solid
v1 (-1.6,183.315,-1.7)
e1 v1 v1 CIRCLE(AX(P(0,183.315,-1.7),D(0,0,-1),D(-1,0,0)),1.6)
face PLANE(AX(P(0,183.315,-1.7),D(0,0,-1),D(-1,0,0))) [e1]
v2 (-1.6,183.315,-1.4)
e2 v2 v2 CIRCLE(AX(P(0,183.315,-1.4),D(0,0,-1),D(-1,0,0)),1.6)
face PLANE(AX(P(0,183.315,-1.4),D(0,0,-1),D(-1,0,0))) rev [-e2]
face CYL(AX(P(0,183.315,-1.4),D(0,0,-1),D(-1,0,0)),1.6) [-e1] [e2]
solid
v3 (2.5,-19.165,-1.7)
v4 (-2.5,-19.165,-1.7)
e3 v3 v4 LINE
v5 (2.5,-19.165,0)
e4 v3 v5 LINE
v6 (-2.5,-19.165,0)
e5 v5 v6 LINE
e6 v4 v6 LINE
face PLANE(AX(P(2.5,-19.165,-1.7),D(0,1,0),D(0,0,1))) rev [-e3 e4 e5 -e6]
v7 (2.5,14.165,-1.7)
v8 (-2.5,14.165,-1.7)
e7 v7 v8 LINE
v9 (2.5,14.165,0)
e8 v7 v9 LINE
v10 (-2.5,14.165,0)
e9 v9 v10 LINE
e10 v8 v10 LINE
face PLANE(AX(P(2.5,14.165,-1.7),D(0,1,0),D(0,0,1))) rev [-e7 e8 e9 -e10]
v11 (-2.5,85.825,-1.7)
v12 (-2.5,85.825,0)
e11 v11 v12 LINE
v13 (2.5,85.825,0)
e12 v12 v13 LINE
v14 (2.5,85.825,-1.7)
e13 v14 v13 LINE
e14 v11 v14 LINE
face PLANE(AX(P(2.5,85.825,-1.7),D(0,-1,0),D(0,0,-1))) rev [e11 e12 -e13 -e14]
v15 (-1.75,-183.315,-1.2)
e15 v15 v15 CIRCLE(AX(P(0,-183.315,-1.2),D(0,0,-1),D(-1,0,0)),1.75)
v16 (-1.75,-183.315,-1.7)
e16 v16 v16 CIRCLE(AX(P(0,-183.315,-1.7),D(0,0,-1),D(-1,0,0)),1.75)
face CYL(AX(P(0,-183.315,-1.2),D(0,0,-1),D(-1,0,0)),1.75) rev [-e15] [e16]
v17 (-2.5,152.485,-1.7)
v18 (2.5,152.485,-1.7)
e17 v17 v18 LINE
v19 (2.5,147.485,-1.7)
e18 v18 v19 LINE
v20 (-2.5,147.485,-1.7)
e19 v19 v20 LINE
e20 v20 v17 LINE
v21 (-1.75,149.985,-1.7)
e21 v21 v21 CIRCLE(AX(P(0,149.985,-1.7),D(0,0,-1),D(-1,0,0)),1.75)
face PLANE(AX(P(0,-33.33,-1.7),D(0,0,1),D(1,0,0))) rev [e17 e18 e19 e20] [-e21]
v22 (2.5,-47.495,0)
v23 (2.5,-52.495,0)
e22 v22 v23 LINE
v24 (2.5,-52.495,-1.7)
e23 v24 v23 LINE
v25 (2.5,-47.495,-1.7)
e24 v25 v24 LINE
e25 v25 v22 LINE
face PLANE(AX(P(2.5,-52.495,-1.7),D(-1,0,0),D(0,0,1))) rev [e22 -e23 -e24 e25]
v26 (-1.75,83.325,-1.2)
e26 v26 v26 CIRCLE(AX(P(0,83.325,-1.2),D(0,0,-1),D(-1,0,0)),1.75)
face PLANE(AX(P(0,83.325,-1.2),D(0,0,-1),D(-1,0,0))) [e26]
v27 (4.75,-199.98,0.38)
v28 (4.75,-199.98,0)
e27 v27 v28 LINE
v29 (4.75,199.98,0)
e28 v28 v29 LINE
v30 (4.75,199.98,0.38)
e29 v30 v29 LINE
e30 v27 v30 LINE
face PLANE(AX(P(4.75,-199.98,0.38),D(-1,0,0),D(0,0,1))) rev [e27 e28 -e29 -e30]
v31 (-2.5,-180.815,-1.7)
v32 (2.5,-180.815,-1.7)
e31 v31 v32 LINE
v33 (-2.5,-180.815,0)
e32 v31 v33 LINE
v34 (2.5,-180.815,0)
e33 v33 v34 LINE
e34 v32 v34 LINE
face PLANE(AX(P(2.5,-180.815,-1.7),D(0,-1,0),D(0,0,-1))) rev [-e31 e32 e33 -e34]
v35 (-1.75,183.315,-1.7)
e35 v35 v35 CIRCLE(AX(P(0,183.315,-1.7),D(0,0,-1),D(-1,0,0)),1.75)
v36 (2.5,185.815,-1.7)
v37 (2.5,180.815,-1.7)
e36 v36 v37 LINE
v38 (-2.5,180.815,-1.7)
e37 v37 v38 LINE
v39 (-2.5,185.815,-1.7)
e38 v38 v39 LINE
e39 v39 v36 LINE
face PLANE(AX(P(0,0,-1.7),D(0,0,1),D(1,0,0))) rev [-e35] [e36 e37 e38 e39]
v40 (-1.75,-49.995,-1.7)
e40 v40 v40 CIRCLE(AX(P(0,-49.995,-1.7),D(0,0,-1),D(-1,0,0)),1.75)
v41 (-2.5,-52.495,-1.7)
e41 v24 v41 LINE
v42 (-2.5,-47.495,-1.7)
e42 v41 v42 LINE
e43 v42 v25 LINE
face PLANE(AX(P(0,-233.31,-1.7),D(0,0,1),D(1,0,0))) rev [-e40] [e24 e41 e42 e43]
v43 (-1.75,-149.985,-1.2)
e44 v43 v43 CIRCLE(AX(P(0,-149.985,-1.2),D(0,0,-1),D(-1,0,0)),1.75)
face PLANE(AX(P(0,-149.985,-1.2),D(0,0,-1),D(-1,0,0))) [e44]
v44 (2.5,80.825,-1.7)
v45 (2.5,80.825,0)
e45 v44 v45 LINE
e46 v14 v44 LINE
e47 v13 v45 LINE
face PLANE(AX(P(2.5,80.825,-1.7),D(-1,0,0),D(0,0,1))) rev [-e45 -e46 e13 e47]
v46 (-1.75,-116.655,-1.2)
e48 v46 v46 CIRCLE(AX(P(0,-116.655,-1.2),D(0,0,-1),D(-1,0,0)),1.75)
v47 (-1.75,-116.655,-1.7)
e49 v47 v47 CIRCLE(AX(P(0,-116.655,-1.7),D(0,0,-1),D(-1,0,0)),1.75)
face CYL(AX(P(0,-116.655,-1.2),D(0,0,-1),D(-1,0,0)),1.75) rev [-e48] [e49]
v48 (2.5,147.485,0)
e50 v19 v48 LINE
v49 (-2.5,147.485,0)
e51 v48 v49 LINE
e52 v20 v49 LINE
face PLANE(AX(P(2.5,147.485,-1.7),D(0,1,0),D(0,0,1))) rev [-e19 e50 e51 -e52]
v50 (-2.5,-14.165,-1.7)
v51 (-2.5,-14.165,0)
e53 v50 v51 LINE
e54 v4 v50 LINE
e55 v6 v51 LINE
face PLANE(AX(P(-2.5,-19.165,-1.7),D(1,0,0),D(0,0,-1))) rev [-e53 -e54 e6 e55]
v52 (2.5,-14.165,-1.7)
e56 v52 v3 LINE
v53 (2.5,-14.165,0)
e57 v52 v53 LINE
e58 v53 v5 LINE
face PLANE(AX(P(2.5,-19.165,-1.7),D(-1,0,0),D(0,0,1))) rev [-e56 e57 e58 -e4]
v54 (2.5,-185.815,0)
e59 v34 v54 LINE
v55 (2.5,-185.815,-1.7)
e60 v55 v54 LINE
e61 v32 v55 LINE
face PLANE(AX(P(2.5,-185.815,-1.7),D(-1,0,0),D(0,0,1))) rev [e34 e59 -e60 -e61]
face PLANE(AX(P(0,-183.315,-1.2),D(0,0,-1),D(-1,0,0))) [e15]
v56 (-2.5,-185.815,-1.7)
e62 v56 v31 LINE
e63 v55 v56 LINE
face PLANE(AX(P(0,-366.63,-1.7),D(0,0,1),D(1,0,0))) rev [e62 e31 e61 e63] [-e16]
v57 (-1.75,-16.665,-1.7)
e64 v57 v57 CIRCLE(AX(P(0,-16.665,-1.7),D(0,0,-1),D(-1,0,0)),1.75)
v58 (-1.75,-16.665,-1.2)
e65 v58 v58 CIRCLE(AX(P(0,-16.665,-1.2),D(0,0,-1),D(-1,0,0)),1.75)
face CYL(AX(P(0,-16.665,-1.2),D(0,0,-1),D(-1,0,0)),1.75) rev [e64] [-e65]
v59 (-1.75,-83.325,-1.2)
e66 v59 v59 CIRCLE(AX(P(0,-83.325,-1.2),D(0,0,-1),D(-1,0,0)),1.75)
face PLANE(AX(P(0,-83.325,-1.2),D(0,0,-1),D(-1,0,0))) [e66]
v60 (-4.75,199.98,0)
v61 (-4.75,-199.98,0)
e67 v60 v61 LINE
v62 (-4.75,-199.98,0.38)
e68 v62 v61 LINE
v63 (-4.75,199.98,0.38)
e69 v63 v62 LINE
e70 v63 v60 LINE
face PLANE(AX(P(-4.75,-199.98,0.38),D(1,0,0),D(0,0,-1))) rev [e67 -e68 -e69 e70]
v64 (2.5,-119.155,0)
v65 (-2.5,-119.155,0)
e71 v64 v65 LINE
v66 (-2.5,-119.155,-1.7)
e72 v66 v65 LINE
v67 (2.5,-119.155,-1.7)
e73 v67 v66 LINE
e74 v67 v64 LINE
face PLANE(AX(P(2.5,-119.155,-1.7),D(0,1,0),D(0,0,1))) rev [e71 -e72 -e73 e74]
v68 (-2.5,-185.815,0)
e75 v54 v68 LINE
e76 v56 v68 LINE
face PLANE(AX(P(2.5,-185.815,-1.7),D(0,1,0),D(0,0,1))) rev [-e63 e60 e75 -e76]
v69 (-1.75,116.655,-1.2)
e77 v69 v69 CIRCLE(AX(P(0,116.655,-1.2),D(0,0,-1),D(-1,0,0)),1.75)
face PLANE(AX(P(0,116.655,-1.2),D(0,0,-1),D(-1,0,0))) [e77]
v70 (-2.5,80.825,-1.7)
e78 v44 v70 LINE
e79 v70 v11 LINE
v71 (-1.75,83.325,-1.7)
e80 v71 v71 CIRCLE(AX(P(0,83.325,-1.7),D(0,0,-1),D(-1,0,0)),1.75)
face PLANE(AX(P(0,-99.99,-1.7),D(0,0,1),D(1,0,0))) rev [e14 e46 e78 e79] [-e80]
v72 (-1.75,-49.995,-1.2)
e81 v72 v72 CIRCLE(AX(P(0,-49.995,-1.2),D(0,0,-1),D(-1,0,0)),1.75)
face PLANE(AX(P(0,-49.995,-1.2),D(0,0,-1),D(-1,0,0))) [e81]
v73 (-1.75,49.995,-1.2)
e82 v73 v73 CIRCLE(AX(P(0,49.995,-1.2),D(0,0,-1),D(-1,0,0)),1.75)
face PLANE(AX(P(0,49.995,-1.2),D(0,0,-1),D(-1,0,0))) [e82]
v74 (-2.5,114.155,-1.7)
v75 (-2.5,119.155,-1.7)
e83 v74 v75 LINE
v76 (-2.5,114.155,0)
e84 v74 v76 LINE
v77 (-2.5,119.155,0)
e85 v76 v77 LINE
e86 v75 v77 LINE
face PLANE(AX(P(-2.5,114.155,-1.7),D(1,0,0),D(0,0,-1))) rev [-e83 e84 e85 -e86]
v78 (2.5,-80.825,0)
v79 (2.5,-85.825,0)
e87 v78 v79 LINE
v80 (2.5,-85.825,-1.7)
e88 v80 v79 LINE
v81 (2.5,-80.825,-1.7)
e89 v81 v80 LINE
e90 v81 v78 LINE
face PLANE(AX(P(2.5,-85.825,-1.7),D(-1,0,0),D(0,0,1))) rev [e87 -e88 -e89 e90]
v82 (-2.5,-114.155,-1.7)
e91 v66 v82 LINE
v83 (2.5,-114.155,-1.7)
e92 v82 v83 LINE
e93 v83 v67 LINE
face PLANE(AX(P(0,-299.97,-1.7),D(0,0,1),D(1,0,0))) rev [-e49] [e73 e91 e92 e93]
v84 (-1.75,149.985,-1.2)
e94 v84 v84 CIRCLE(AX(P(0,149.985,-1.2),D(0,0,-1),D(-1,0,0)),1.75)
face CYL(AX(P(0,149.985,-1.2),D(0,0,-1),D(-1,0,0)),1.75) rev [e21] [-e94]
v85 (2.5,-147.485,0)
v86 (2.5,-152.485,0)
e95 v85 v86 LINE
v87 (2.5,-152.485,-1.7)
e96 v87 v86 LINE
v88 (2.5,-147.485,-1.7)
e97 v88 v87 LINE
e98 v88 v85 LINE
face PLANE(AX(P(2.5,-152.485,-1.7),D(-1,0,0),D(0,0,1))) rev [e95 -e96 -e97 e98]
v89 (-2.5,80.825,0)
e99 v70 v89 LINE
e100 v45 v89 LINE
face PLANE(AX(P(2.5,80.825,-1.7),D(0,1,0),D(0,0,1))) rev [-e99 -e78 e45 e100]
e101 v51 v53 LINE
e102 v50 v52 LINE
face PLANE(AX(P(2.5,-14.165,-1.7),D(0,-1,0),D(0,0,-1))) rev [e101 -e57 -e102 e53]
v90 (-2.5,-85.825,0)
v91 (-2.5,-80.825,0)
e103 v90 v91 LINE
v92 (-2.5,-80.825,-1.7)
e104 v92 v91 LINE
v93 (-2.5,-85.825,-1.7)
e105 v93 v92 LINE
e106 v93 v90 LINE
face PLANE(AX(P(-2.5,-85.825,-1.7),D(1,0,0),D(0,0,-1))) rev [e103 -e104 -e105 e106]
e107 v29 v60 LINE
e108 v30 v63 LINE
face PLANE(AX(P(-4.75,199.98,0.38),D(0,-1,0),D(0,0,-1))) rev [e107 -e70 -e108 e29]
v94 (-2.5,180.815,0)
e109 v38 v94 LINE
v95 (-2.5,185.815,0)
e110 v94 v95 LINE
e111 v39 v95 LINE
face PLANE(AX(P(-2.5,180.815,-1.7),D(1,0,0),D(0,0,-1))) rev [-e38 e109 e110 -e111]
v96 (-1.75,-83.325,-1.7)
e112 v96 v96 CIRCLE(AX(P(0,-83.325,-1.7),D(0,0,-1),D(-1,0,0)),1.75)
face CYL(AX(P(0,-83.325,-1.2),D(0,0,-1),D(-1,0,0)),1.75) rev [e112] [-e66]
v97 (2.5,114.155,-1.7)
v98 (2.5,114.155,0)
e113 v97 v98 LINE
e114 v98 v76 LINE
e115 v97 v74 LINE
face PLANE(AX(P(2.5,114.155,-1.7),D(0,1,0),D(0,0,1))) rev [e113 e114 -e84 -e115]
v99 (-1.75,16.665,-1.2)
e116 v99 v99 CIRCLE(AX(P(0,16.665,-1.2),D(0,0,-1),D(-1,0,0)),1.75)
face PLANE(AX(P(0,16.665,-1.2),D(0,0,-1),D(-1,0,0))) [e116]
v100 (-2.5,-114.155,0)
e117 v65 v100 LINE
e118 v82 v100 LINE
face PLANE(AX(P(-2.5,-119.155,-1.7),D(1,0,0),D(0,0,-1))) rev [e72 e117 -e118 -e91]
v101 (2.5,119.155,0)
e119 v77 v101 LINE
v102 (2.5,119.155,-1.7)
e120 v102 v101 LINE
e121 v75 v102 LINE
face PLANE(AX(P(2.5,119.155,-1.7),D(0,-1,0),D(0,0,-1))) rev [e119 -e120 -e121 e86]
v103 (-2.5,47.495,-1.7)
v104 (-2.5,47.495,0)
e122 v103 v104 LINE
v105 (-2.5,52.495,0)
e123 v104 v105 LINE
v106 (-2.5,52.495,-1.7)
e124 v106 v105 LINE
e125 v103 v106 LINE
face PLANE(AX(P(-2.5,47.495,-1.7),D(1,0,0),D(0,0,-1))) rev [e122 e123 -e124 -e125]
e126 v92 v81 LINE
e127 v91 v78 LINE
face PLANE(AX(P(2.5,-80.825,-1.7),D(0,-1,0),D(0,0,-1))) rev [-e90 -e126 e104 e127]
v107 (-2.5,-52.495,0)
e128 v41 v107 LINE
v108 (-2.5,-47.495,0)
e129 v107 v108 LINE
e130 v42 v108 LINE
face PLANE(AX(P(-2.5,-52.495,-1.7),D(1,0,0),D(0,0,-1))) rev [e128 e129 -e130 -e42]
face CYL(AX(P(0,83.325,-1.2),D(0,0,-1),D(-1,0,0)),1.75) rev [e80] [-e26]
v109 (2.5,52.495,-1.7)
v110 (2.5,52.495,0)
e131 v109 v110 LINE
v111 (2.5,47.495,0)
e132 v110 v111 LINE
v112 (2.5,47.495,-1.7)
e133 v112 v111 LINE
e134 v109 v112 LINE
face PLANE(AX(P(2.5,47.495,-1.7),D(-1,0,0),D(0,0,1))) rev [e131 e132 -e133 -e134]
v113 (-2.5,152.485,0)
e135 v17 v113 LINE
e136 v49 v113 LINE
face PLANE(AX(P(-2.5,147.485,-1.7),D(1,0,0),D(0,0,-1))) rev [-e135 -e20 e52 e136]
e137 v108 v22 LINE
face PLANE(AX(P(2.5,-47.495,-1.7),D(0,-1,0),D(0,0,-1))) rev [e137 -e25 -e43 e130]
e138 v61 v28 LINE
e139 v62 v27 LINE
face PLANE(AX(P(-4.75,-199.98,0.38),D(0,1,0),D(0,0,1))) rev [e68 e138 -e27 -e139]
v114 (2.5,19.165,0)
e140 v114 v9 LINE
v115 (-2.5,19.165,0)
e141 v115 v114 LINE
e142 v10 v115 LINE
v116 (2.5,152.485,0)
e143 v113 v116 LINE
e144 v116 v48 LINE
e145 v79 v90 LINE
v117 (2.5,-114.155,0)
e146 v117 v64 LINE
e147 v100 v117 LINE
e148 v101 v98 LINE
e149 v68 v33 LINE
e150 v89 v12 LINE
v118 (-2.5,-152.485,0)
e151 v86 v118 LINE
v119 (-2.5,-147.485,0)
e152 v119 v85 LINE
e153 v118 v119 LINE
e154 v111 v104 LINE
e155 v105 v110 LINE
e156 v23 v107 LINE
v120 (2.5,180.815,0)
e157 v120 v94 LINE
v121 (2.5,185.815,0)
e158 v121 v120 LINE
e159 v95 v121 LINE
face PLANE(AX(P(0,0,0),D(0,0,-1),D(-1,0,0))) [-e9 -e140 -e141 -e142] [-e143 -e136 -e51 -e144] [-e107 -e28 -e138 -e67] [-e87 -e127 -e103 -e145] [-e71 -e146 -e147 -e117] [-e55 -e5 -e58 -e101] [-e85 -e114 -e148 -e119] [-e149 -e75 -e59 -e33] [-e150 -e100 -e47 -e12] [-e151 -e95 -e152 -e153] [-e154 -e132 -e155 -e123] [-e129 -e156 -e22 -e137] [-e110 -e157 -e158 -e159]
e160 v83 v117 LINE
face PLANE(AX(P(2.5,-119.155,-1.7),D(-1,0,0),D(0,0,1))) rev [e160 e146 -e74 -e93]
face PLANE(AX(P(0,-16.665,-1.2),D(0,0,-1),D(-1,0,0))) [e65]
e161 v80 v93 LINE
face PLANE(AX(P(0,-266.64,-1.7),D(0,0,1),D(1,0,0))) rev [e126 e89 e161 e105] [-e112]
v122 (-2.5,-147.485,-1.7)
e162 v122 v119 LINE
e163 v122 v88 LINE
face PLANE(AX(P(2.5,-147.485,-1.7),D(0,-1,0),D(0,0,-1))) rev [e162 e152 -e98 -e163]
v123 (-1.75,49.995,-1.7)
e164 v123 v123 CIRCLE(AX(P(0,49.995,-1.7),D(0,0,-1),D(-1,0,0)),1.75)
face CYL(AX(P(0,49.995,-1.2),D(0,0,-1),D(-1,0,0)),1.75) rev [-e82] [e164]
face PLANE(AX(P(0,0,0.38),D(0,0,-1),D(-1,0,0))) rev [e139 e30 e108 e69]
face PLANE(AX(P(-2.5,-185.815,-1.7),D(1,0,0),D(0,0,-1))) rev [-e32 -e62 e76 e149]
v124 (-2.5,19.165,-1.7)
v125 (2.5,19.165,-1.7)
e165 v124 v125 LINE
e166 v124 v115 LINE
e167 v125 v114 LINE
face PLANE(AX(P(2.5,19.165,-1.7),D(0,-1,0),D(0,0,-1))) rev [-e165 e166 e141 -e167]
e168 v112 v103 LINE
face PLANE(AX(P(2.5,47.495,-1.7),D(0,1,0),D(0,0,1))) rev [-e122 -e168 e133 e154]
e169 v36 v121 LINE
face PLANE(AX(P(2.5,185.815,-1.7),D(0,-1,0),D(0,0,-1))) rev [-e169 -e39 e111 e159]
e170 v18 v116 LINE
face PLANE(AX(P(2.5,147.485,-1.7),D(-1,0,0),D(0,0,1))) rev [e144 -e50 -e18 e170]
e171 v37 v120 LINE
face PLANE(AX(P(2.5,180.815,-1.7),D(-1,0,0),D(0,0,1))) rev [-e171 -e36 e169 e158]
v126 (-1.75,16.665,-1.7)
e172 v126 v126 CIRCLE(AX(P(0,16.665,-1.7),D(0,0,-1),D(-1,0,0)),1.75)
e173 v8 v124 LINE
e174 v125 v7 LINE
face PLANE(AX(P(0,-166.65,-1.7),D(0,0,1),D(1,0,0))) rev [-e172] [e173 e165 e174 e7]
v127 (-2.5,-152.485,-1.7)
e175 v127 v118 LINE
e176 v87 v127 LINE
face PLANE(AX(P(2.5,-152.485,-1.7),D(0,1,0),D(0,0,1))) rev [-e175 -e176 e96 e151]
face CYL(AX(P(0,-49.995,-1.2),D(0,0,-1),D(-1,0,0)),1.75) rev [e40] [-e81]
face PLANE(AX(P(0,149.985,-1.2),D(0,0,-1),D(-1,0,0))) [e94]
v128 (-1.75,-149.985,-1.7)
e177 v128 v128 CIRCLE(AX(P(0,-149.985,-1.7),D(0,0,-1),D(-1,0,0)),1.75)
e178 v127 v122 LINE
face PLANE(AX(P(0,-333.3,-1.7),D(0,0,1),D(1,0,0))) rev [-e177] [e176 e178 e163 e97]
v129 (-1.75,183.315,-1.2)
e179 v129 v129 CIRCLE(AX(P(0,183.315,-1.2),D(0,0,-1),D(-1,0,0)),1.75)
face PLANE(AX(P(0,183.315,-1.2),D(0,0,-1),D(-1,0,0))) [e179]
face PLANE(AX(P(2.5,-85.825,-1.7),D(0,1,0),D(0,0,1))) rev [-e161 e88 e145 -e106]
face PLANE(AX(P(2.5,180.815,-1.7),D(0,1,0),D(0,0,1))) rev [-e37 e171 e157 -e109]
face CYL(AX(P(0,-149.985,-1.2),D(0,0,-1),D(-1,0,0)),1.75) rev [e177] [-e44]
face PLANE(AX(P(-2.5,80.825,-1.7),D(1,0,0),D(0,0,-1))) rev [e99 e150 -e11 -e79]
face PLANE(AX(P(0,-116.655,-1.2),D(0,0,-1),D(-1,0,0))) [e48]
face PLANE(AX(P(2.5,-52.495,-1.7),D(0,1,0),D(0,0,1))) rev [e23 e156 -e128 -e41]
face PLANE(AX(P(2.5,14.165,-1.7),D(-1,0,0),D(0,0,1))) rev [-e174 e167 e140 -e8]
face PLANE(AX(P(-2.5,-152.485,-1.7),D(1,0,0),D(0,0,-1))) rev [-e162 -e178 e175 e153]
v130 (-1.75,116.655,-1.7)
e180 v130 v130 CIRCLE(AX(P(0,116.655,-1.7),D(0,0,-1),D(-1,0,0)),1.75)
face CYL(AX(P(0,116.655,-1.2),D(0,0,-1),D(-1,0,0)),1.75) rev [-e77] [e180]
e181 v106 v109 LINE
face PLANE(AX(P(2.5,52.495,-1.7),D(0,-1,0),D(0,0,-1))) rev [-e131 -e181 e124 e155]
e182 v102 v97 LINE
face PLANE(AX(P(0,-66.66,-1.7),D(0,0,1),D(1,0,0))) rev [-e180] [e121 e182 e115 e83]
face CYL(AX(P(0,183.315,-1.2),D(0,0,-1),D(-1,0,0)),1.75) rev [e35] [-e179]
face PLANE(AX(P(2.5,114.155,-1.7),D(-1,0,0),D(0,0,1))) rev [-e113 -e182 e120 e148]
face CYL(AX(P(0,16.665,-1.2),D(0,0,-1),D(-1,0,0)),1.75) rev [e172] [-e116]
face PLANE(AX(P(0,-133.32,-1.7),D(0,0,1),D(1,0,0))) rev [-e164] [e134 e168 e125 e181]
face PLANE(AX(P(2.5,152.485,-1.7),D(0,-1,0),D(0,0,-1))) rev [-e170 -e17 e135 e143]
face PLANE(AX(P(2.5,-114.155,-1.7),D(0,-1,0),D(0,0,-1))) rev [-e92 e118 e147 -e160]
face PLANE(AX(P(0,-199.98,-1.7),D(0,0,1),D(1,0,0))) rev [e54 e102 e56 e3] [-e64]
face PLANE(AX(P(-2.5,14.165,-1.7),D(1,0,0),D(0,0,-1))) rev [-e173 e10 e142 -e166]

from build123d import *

# Parameters (mm, degrees)
SKETCH_1_W                   = 9.5
SKETCH_1_H                   = 399.96
EXTRUDE_1_DEPTH              = 0.38
SKETCH_2_W                   = 5
SKETCH_2_H                   = 5
EXTRUDE_2_DEPTH              = 1.7
SKETCH_3_R                   = 1.75
CUT_EXTRUDE_1_DEPTH          = 0.5
SKETCH_4_R                   = 1.6
EXTRUDE_3_DEPTH              = 0.3
PATTERN_START                = -1.2
PATTERN_LINEAR_2_OUTLINE_W   = 5
PATTERN_LINEAR_2_OUTLINE_H   = 5
PATTERN_LINEAR_2_DEPTH       = 1.2
PATTERN_START_2              = -1.7
PATTERN_LINEAR_2_2_OUTLINE_W = 5
PATTERN_LINEAR_2_2_OUTLINE_H = 5
PATTERN_LINEAR_2_2_OUTLINE_R = 1.75
PATTERN_LINEAR_2_2_DEPTH     = 0.5


# Read off the part's stored shape, not the designer's step: 阵列(线性)2
with BuildPart() as part:
    # 草图1 → 凸台-拉伸1 (new body)
    with BuildSketch(Plane.XY):
        Rectangle(SKETCH_1_W, SKETCH_1_H)
    extrude(amount=EXTRUDE_1_DEPTH)

    # 草图2 → 凸台-拉伸2 (add)
    with BuildSketch(Plane(origin=(0, 0, 0), x_dir=(-1, 0, 0), z_dir=(0, 0, -1))):
        with Locations((0, 183.315)):
            Rectangle(SKETCH_2_W, SKETCH_2_H)
    extrude(amount=EXTRUDE_2_DEPTH)

    # 草图3 → 切除-拉伸1 (cut)
    with BuildSketch(Plane(origin=(0, 0, -1.7), x_dir=(-1, 0, 0), z_dir=(0, 0, -1))):
        with Locations((0, 183.315)):
            Circle(SKETCH_3_R)
    extrude(amount=-CUT_EXTRUDE_1_DEPTH, mode=Mode.SUBTRACT)

    # 阵列(线性)2 outline → 阵列(线性)2 (add)
    with BuildSketch(Plane.XY.offset(PATTERN_START)):
        with Locations((0, 149.985)):
            Rectangle(PATTERN_LINEAR_2_OUTLINE_W, PATTERN_LINEAR_2_OUTLINE_H)
        with Locations((0, 116.655)):
            Rectangle(PATTERN_LINEAR_2_OUTLINE_W, PATTERN_LINEAR_2_OUTLINE_H)
        with Locations((0, 83.325)):
            Rectangle(PATTERN_LINEAR_2_OUTLINE_W, PATTERN_LINEAR_2_OUTLINE_H)
        with Locations((0, 49.995)):
            Rectangle(PATTERN_LINEAR_2_OUTLINE_W, PATTERN_LINEAR_2_OUTLINE_H)
        with Locations((0, 16.665)):
            Rectangle(PATTERN_LINEAR_2_OUTLINE_W, PATTERN_LINEAR_2_OUTLINE_H)
        with Locations((0, -16.665)):
            Rectangle(PATTERN_LINEAR_2_OUTLINE_W, PATTERN_LINEAR_2_OUTLINE_H)
        with Locations((0, -49.995)):
            Rectangle(PATTERN_LINEAR_2_OUTLINE_W, PATTERN_LINEAR_2_OUTLINE_H)
        with Locations((0, -83.325)):
            Rectangle(PATTERN_LINEAR_2_OUTLINE_W, PATTERN_LINEAR_2_OUTLINE_H)
        with Locations((0, -116.655)):
            Rectangle(PATTERN_LINEAR_2_OUTLINE_W, PATTERN_LINEAR_2_OUTLINE_H)
        with Locations((0, -149.985)):
            Rectangle(PATTERN_LINEAR_2_OUTLINE_W, PATTERN_LINEAR_2_OUTLINE_H)
        with Locations((0, -183.315)):
            Rectangle(PATTERN_LINEAR_2_OUTLINE_W, PATTERN_LINEAR_2_OUTLINE_H)
    extrude(amount=PATTERN_LINEAR_2_DEPTH)

    # Pattern Linear 2 2 outline → Pattern Linear 2 2 (add)
    # profile 1 of 11: a face of its own
    with BuildSketch(Plane.XY.offset(PATTERN_START_2)):
        with Locations((0, 149.985)):
            Rectangle(PATTERN_LINEAR_2_2_OUTLINE_W, PATTERN_LINEAR_2_2_OUTLINE_H)
        with Locations((0, 149.985)):
            Circle(PATTERN_LINEAR_2_2_OUTLINE_R, mode=Mode.SUBTRACT)
    # profile 2 of 11: a face of its own
    with BuildSketch(Plane.XY.offset(PATTERN_START_2)):
        with Locations((0, 116.655)):
            Rectangle(PATTERN_LINEAR_2_2_OUTLINE_W, PATTERN_LINEAR_2_2_OUTLINE_H)
        with Locations((0, 116.655)):
            Circle(PATTERN_LINEAR_2_2_OUTLINE_R, mode=Mode.SUBTRACT)
    # profile 3 of 11: a face of its own
    with BuildSketch(Plane.XY.offset(PATTERN_START_2)):
        with Locations((0, 83.325)):
            Rectangle(PATTERN_LINEAR_2_2_OUTLINE_W, PATTERN_LINEAR_2_2_OUTLINE_H)
        with Locations((0, 83.325)):
            Circle(PATTERN_LINEAR_2_2_OUTLINE_R, mode=Mode.SUBTRACT)
    # profile 4 of 11: a face of its own
    with BuildSketch(Plane.XY.offset(PATTERN_START_2)):
        with Locations((0, 49.995)):
            Rectangle(PATTERN_LINEAR_2_2_OUTLINE_W, PATTERN_LINEAR_2_2_OUTLINE_H)
        with Locations((0, 49.995)):
            Circle(PATTERN_LINEAR_2_2_OUTLINE_R, mode=Mode.SUBTRACT)
    # profile 5 of 11: a face of its own
    with BuildSketch(Plane.XY.offset(PATTERN_START_2)):
        with Locations((0, 16.665)):
            Rectangle(PATTERN_LINEAR_2_2_OUTLINE_W, PATTERN_LINEAR_2_2_OUTLINE_H)
        with Locations((0, 16.665)):
            Circle(PATTERN_LINEAR_2_2_OUTLINE_R, mode=Mode.SUBTRACT)
    # profile 6 of 11: a face of its own
    with BuildSketch(Plane.XY.offset(PATTERN_START_2)):
        with Locations((0, -16.665)):
            Rectangle(PATTERN_LINEAR_2_2_OUTLINE_W, PATTERN_LINEAR_2_2_OUTLINE_H)
        with Locations((0, -16.665)):
            Circle(PATTERN_LINEAR_2_2_OUTLINE_R, mode=Mode.SUBTRACT)
    # profile 7 of 11: a face of its own
    with BuildSketch(Plane.XY.offset(PATTERN_START_2)):
        with Locations((0, -49.995)):
            Rectangle(PATTERN_LINEAR_2_2_OUTLINE_W, PATTERN_LINEAR_2_2_OUTLINE_H)
        with Locations((0, -49.995)):
            Circle(PATTERN_LINEAR_2_2_OUTLINE_R, mode=Mode.SUBTRACT)
    # profile 8 of 11: a face of its own
    with BuildSketch(Plane.XY.offset(PATTERN_START_2)):
        with Locations((0, -83.325)):
            Rectangle(PATTERN_LINEAR_2_2_OUTLINE_W, PATTERN_LINEAR_2_2_OUTLINE_H)
        with Locations((0, -83.325)):
            Circle(PATTERN_LINEAR_2_2_OUTLINE_R, mode=Mode.SUBTRACT)
    # profile 9 of 11: a face of its own
    with BuildSketch(Plane.XY.offset(PATTERN_START_2)):
        with Locations((0, -116.655)):
            Rectangle(PATTERN_LINEAR_2_2_OUTLINE_W, PATTERN_LINEAR_2_2_OUTLINE_H)
        with Locations((0, -116.655)):
            Circle(PATTERN_LINEAR_2_2_OUTLINE_R, mode=Mode.SUBTRACT)
    # profile 10 of 11: a face of its own
    with BuildSketch(Plane.XY.offset(PATTERN_START_2)):
        with Locations((0, -149.985)):
            Rectangle(PATTERN_LINEAR_2_2_OUTLINE_W, PATTERN_LINEAR_2_2_OUTLINE_H)
        with Locations((0, -149.985)):
            Circle(PATTERN_LINEAR_2_2_OUTLINE_R, mode=Mode.SUBTRACT)
    # profile 11 of 11: a face of its own
    with BuildSketch(Plane.XY.offset(PATTERN_START_2)):
        with Locations((0, -183.315)):
            Rectangle(PATTERN_LINEAR_2_2_OUTLINE_W, PATTERN_LINEAR_2_2_OUTLINE_H)
        with Locations((0, -183.315)):
            Circle(PATTERN_LINEAR_2_2_OUTLINE_R, mode=Mode.SUBTRACT)
    extrude(amount=PATTERN_LINEAR_2_2_DEPTH)


with BuildPart() as body_2:
    # 草图4 → 凸台-拉伸3 (new body)
    with BuildSketch(Plane(origin=(0, 0, -1.7), x_dir=(-1, 0, 0), z_dir=(0, 0, -1))):
        with Locations((0, 183.315)):
            Circle(SKETCH_4_R)
    extrude(amount=-EXTRUDE_3_DEPTH)


solid = Compound([part.part, body_2.part])
